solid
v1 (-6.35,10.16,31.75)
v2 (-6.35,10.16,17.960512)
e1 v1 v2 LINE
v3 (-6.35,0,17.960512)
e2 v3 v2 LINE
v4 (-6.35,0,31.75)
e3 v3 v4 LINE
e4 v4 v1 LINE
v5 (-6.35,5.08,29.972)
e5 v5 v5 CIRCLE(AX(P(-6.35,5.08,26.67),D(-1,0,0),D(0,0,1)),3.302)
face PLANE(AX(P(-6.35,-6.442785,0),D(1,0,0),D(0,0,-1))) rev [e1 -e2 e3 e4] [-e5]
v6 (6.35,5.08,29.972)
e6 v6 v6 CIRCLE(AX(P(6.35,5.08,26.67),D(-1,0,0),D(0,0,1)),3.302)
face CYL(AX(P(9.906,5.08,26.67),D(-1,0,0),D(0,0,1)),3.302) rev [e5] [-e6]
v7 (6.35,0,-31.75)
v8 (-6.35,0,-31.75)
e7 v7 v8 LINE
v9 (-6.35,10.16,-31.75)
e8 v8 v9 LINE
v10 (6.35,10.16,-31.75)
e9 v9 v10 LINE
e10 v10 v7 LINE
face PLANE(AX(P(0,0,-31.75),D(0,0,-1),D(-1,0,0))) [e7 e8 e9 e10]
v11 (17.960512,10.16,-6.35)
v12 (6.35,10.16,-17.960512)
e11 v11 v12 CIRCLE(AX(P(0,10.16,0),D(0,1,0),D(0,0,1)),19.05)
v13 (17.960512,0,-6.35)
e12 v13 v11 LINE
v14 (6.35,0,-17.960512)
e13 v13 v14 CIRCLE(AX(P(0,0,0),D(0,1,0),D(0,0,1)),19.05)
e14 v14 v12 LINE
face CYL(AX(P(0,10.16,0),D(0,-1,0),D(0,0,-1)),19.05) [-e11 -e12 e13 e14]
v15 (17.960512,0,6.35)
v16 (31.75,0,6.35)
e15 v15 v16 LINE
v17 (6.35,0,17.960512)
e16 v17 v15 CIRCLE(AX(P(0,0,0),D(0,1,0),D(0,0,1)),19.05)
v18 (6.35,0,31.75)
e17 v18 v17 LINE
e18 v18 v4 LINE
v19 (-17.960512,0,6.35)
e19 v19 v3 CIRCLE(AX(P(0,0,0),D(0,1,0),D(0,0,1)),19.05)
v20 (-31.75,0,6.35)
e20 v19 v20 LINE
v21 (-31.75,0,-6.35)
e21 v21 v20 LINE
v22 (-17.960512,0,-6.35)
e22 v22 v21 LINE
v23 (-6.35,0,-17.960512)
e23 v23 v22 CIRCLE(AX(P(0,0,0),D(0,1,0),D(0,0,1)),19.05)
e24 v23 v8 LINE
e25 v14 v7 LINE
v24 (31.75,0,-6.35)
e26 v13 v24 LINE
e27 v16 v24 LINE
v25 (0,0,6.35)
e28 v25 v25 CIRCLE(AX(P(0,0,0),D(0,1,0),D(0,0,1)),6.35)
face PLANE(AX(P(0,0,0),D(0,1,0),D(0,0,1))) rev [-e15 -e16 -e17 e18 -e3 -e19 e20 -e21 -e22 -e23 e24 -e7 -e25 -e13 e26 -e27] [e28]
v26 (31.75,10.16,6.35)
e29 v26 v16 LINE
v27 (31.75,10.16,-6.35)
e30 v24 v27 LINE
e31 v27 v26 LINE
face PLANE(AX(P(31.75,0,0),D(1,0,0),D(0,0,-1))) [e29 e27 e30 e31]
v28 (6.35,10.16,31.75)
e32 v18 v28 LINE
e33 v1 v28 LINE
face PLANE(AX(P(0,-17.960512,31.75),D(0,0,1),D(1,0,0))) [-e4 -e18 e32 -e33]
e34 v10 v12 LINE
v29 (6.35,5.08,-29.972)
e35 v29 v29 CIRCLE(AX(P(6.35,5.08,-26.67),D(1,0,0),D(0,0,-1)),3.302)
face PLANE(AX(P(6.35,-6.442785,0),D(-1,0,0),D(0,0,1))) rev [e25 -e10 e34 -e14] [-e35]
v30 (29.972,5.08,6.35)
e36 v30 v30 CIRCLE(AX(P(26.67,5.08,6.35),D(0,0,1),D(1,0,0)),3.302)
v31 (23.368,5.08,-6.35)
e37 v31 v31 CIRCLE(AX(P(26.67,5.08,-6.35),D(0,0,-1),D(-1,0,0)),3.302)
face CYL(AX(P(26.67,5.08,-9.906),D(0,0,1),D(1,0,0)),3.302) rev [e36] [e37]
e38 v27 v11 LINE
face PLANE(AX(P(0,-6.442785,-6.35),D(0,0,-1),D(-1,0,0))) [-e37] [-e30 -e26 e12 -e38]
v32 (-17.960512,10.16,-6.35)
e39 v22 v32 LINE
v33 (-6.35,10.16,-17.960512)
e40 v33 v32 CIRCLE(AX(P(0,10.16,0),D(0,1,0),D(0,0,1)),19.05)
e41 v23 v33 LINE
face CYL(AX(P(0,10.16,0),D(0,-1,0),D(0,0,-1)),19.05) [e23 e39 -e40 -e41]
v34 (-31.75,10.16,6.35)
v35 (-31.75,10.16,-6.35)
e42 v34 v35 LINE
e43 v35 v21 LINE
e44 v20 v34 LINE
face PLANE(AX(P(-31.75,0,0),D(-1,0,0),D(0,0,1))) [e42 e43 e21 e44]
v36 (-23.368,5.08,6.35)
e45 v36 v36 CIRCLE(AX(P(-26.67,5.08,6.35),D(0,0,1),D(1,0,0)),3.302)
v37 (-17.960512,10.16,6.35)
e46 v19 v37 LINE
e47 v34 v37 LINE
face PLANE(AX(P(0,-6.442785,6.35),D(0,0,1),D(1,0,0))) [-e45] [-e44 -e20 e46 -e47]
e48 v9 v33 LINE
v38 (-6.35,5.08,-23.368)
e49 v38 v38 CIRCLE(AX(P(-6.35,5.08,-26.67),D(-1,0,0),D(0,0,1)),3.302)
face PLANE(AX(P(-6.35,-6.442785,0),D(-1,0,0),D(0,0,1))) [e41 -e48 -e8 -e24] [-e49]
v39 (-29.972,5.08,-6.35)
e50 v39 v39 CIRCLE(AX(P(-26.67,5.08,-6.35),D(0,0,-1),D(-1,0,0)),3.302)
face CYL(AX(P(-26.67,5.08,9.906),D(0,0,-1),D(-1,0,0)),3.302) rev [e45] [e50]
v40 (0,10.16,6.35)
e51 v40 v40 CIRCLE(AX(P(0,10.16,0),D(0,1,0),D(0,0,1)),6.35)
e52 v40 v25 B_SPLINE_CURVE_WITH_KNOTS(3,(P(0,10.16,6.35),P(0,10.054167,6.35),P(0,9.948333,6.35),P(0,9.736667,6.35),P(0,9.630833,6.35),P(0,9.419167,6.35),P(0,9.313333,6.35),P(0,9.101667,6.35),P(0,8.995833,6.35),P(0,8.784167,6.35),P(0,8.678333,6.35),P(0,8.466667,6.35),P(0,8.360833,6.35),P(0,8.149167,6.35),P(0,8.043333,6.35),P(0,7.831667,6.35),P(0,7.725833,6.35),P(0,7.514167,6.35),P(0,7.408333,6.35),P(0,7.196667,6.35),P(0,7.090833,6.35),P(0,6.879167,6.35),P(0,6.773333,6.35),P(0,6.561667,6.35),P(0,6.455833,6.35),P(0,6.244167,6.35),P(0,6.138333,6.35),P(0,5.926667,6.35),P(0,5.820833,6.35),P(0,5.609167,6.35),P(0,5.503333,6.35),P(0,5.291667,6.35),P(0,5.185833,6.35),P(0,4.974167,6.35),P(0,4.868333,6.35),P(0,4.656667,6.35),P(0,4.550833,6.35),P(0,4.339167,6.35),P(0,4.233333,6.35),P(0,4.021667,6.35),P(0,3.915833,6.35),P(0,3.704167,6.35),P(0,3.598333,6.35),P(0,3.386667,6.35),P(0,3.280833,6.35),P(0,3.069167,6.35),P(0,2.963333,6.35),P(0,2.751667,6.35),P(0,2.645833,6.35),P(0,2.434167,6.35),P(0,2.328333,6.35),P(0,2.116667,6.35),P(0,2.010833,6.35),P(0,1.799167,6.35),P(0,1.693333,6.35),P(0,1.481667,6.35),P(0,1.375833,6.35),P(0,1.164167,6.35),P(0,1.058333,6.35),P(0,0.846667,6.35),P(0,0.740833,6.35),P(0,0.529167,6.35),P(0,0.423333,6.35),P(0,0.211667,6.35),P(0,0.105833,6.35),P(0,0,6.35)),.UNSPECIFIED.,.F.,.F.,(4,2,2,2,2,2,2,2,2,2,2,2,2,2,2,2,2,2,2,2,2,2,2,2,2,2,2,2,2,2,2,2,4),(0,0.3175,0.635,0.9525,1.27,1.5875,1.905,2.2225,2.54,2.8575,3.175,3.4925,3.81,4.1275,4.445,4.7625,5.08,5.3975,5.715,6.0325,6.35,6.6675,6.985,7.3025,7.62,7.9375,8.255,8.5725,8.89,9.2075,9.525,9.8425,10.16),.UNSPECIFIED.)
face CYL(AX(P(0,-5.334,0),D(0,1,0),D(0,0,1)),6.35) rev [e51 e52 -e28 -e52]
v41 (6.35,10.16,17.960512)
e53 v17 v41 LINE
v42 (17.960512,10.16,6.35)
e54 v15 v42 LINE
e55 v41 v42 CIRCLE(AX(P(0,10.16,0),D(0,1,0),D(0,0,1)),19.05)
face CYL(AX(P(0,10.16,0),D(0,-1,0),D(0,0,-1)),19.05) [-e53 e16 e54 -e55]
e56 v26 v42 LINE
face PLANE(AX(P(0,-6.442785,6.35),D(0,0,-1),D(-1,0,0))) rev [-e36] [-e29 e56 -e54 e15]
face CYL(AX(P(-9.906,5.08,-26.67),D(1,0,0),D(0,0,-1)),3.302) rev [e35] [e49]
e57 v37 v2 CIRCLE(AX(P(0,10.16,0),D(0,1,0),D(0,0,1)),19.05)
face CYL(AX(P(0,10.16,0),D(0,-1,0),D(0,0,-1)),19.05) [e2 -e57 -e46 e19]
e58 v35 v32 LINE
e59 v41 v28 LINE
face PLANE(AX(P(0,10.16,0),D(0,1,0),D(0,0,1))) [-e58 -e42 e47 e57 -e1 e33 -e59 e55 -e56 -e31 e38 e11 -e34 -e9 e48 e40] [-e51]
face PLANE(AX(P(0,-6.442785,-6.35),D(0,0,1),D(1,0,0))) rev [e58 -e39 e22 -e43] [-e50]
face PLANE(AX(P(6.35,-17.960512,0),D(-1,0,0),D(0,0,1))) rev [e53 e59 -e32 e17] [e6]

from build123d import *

# Parameters (mm, degrees)
SKETCH1_R               = 19.05
BOSS_EXTRUDE1_DEPTH     = 10.16
SKETCH2_R               = 6.35
CUT_EXTRUDE1_DEPTH      = 15.494
SKETCH6_W               = 12.7
SKETCH6_H               = 12.7
BOSS_EXTRUDE6_DEPTH     = 10.16
BOSS_EXTRUDE7_START     = -10.16
BOSS_EXTRUDE7_DEPTH     = 10.16
CIRPATTERN7_START       = -6.35
CIRPATTERN7_OUTLINE_W   = 10.16
CIRPATTERN7_OUTLINE_H   = 12.7
CIRPATTERN7_DEPTH       = 12.7
CIRPATTERN7_START_2     = -19.05
CIRPATTERN7_2_OUTLINE_W = 10.16
CIRPATTERN7_2_OUTLINE_H = 12.7
CIRPATTERN7_2_DEPTH     = 1.089487758
CIRPATTERN7_START_3     = 17.960512242
CIRPATTERN7_3_OUTLINE_W = 10.16
CIRPATTERN7_3_OUTLINE_H = 12.7
CIRPATTERN7_3_DEPTH     = 1.089487758
SKETCH7_W               = 12.7
SKETCH7_H               = 10.16
BOSS_EXTRUDE9_DEPTH     = 12.7
SKETCH10_W              = 12.7
SKETCH10_H              = 10.16
BOSS_EXTRUDE10_DEPTH    = 12.7
SKETCH11_W              = 12.7
SKETCH11_H              = 10.16
BOSS_EXTRUDE11_DEPTH    = 12.7
SKETCH12_R              = 3.302
CUT_EXTRUDE3_DEPTH      = 16.256
CIRPATTERN8_COUNT       = 4


# Read off the part's stored shape, not the designer's step: CirPattern7
with BuildPart() as part:
    # Sketch1 → Boss-Extrude1 (new body)
    with BuildSketch(Plane(origin=(0, 0, 0), x_dir=(1, 0, 0), z_dir=(0, 1, 0))):
        with Locations(Location((0, 0, 0), (0, 0, 270))):
            Circle(SKETCH1_R)
    extrude(amount=BOSS_EXTRUDE1_DEPTH)

    # Sketch2 → Cut-Extrude1 (cut)
    with BuildSketch(Plane(origin=(0, 10.16, 0), x_dir=(1, 0, 0), z_dir=(0, 1, 0))):
        with Locations(Location((0, 0, 0), (0, 0, 270))):
            Circle(SKETCH2_R)
    extrude(amount=-CUT_EXTRUDE1_DEPTH, mode=Mode.SUBTRACT)



with BuildPart() as body_2:
    # Sketch6 → Boss-Extrude6 (new body)
    with BuildSketch(Plane(origin=(0, 10.16, 0), x_dir=(1, 0, 0), z_dir=(0, 1, 0))):
        with Locations((0, -25.4)):
            Rectangle(SKETCH6_W, SKETCH6_H)
    extrude(amount=-BOSS_EXTRUDE6_DEPTH)


with BuildPart() as part_1:
    add(part.part)

    add(body_2.part)  # Boss-Extrude7 merges body 2
    # Sketch6<4> → Boss-Extrude7 (add)
    with BuildSketch(Plane(origin=(0, 10.16, 0), x_dir=(1, 0, 0), z_dir=(0, 1, 0)).offset(BOSS_EXTRUDE7_START)):
        with BuildLine():
            Line((-6.35, -17.960512242), (-6.35, -19.05))
            Line((-6.35, -19.05), (0, -19.05))
            ThreePointArc((0, -19.05), (-3.221392695, -18.775652561), (-6.35, -17.960512242))
        make_face()
        with BuildLine():
            ThreePointArc((6.35, -17.960512242), (3.221392695, -18.775652561), (0, -19.05))
            Line((0, -19.05), (6.35, -19.05))
            Line((6.35, -19.05), (6.35, -17.960512242))
        make_face()
    extrude(amount=BOSS_EXTRUDE7_DEPTH)

    # CirPattern7 outline → CirPattern7 (add)
    with BuildSketch(Plane.YZ.offset(CIRPATTERN7_START)):
        with Locations((5.08, -12.7)):
            Rectangle(CIRPATTERN7_OUTLINE_W, CIRPATTERN7_OUTLINE_H)
    extrude(amount=CIRPATTERN7_DEPTH)

    # CirPattern7 2 outline → CirPattern7 2 (add)
    with BuildSketch(Plane.YZ.offset(CIRPATTERN7_START_2)):
        with Locations((5.08, 0)):
            Rectangle(CIRPATTERN7_2_OUTLINE_W, CIRPATTERN7_2_OUTLINE_H)
    extrude(amount=CIRPATTERN7_2_DEPTH)

    # CirPattern7 3 outline → CirPattern7 3 (add)
    with BuildSketch(Plane.YZ.offset(CIRPATTERN7_START_3)):
        with Locations((5.08, 0)):
            Rectangle(CIRPATTERN7_3_OUTLINE_W, CIRPATTERN7_3_OUTLINE_H)
    extrude(amount=CIRPATTERN7_3_DEPTH)

    # Sketch7 → Boss-Extrude9 (add)
    with BuildSketch(Plane.ZY.offset(19.05)):
        with Locations((0, 5.08)):
            Rectangle(SKETCH7_W, SKETCH7_H)
    extrude(amount=BOSS_EXTRUDE9_DEPTH)

    # Sketch10 → Boss-Extrude10 (add)
    with BuildSketch(Plane(origin=(19.05, 0, 0), x_dir=(0, 0, -1), z_dir=(1, 0, 0))):
        with Locations((0, 5.08)):
            Rectangle(SKETCH10_W, SKETCH10_H)
    extrude(amount=BOSS_EXTRUDE10_DEPTH)

    # Sketch11 → Boss-Extrude11 (add)
    with BuildSketch(Plane(origin=(0, 0, -19.05), x_dir=(-1, 0, 0), z_dir=(0, 0, -1))):
        with Locations((0, 5.08)):
            Rectangle(SKETCH11_W, SKETCH11_H)
    extrude(amount=BOSS_EXTRUDE11_DEPTH)

    # Sketch12 → Cut-Extrude3 (cut)
    with BuildSketch(Plane.XY.offset(6.35)):
        with Locations((26.67, 5.08)):
            Circle(SKETCH12_R)
    cut_extrude3 = extrude(amount=-CUT_EXTRUDE3_DEPTH, mode=Mode.SUBTRACT)

    # CirPattern8: Cut-Extrude3 ×4 about axis
    cirpattern8_axis = Axis((0, 0, 0), (0, -1, 0))
    for i in range(1, CIRPATTERN8_COUNT):
        add(cut_extrude3.rotate(cirpattern8_axis, i * 360 / CIRPATTERN8_COUNT), mode=Mode.SUBTRACT)


solid = part_1.part
